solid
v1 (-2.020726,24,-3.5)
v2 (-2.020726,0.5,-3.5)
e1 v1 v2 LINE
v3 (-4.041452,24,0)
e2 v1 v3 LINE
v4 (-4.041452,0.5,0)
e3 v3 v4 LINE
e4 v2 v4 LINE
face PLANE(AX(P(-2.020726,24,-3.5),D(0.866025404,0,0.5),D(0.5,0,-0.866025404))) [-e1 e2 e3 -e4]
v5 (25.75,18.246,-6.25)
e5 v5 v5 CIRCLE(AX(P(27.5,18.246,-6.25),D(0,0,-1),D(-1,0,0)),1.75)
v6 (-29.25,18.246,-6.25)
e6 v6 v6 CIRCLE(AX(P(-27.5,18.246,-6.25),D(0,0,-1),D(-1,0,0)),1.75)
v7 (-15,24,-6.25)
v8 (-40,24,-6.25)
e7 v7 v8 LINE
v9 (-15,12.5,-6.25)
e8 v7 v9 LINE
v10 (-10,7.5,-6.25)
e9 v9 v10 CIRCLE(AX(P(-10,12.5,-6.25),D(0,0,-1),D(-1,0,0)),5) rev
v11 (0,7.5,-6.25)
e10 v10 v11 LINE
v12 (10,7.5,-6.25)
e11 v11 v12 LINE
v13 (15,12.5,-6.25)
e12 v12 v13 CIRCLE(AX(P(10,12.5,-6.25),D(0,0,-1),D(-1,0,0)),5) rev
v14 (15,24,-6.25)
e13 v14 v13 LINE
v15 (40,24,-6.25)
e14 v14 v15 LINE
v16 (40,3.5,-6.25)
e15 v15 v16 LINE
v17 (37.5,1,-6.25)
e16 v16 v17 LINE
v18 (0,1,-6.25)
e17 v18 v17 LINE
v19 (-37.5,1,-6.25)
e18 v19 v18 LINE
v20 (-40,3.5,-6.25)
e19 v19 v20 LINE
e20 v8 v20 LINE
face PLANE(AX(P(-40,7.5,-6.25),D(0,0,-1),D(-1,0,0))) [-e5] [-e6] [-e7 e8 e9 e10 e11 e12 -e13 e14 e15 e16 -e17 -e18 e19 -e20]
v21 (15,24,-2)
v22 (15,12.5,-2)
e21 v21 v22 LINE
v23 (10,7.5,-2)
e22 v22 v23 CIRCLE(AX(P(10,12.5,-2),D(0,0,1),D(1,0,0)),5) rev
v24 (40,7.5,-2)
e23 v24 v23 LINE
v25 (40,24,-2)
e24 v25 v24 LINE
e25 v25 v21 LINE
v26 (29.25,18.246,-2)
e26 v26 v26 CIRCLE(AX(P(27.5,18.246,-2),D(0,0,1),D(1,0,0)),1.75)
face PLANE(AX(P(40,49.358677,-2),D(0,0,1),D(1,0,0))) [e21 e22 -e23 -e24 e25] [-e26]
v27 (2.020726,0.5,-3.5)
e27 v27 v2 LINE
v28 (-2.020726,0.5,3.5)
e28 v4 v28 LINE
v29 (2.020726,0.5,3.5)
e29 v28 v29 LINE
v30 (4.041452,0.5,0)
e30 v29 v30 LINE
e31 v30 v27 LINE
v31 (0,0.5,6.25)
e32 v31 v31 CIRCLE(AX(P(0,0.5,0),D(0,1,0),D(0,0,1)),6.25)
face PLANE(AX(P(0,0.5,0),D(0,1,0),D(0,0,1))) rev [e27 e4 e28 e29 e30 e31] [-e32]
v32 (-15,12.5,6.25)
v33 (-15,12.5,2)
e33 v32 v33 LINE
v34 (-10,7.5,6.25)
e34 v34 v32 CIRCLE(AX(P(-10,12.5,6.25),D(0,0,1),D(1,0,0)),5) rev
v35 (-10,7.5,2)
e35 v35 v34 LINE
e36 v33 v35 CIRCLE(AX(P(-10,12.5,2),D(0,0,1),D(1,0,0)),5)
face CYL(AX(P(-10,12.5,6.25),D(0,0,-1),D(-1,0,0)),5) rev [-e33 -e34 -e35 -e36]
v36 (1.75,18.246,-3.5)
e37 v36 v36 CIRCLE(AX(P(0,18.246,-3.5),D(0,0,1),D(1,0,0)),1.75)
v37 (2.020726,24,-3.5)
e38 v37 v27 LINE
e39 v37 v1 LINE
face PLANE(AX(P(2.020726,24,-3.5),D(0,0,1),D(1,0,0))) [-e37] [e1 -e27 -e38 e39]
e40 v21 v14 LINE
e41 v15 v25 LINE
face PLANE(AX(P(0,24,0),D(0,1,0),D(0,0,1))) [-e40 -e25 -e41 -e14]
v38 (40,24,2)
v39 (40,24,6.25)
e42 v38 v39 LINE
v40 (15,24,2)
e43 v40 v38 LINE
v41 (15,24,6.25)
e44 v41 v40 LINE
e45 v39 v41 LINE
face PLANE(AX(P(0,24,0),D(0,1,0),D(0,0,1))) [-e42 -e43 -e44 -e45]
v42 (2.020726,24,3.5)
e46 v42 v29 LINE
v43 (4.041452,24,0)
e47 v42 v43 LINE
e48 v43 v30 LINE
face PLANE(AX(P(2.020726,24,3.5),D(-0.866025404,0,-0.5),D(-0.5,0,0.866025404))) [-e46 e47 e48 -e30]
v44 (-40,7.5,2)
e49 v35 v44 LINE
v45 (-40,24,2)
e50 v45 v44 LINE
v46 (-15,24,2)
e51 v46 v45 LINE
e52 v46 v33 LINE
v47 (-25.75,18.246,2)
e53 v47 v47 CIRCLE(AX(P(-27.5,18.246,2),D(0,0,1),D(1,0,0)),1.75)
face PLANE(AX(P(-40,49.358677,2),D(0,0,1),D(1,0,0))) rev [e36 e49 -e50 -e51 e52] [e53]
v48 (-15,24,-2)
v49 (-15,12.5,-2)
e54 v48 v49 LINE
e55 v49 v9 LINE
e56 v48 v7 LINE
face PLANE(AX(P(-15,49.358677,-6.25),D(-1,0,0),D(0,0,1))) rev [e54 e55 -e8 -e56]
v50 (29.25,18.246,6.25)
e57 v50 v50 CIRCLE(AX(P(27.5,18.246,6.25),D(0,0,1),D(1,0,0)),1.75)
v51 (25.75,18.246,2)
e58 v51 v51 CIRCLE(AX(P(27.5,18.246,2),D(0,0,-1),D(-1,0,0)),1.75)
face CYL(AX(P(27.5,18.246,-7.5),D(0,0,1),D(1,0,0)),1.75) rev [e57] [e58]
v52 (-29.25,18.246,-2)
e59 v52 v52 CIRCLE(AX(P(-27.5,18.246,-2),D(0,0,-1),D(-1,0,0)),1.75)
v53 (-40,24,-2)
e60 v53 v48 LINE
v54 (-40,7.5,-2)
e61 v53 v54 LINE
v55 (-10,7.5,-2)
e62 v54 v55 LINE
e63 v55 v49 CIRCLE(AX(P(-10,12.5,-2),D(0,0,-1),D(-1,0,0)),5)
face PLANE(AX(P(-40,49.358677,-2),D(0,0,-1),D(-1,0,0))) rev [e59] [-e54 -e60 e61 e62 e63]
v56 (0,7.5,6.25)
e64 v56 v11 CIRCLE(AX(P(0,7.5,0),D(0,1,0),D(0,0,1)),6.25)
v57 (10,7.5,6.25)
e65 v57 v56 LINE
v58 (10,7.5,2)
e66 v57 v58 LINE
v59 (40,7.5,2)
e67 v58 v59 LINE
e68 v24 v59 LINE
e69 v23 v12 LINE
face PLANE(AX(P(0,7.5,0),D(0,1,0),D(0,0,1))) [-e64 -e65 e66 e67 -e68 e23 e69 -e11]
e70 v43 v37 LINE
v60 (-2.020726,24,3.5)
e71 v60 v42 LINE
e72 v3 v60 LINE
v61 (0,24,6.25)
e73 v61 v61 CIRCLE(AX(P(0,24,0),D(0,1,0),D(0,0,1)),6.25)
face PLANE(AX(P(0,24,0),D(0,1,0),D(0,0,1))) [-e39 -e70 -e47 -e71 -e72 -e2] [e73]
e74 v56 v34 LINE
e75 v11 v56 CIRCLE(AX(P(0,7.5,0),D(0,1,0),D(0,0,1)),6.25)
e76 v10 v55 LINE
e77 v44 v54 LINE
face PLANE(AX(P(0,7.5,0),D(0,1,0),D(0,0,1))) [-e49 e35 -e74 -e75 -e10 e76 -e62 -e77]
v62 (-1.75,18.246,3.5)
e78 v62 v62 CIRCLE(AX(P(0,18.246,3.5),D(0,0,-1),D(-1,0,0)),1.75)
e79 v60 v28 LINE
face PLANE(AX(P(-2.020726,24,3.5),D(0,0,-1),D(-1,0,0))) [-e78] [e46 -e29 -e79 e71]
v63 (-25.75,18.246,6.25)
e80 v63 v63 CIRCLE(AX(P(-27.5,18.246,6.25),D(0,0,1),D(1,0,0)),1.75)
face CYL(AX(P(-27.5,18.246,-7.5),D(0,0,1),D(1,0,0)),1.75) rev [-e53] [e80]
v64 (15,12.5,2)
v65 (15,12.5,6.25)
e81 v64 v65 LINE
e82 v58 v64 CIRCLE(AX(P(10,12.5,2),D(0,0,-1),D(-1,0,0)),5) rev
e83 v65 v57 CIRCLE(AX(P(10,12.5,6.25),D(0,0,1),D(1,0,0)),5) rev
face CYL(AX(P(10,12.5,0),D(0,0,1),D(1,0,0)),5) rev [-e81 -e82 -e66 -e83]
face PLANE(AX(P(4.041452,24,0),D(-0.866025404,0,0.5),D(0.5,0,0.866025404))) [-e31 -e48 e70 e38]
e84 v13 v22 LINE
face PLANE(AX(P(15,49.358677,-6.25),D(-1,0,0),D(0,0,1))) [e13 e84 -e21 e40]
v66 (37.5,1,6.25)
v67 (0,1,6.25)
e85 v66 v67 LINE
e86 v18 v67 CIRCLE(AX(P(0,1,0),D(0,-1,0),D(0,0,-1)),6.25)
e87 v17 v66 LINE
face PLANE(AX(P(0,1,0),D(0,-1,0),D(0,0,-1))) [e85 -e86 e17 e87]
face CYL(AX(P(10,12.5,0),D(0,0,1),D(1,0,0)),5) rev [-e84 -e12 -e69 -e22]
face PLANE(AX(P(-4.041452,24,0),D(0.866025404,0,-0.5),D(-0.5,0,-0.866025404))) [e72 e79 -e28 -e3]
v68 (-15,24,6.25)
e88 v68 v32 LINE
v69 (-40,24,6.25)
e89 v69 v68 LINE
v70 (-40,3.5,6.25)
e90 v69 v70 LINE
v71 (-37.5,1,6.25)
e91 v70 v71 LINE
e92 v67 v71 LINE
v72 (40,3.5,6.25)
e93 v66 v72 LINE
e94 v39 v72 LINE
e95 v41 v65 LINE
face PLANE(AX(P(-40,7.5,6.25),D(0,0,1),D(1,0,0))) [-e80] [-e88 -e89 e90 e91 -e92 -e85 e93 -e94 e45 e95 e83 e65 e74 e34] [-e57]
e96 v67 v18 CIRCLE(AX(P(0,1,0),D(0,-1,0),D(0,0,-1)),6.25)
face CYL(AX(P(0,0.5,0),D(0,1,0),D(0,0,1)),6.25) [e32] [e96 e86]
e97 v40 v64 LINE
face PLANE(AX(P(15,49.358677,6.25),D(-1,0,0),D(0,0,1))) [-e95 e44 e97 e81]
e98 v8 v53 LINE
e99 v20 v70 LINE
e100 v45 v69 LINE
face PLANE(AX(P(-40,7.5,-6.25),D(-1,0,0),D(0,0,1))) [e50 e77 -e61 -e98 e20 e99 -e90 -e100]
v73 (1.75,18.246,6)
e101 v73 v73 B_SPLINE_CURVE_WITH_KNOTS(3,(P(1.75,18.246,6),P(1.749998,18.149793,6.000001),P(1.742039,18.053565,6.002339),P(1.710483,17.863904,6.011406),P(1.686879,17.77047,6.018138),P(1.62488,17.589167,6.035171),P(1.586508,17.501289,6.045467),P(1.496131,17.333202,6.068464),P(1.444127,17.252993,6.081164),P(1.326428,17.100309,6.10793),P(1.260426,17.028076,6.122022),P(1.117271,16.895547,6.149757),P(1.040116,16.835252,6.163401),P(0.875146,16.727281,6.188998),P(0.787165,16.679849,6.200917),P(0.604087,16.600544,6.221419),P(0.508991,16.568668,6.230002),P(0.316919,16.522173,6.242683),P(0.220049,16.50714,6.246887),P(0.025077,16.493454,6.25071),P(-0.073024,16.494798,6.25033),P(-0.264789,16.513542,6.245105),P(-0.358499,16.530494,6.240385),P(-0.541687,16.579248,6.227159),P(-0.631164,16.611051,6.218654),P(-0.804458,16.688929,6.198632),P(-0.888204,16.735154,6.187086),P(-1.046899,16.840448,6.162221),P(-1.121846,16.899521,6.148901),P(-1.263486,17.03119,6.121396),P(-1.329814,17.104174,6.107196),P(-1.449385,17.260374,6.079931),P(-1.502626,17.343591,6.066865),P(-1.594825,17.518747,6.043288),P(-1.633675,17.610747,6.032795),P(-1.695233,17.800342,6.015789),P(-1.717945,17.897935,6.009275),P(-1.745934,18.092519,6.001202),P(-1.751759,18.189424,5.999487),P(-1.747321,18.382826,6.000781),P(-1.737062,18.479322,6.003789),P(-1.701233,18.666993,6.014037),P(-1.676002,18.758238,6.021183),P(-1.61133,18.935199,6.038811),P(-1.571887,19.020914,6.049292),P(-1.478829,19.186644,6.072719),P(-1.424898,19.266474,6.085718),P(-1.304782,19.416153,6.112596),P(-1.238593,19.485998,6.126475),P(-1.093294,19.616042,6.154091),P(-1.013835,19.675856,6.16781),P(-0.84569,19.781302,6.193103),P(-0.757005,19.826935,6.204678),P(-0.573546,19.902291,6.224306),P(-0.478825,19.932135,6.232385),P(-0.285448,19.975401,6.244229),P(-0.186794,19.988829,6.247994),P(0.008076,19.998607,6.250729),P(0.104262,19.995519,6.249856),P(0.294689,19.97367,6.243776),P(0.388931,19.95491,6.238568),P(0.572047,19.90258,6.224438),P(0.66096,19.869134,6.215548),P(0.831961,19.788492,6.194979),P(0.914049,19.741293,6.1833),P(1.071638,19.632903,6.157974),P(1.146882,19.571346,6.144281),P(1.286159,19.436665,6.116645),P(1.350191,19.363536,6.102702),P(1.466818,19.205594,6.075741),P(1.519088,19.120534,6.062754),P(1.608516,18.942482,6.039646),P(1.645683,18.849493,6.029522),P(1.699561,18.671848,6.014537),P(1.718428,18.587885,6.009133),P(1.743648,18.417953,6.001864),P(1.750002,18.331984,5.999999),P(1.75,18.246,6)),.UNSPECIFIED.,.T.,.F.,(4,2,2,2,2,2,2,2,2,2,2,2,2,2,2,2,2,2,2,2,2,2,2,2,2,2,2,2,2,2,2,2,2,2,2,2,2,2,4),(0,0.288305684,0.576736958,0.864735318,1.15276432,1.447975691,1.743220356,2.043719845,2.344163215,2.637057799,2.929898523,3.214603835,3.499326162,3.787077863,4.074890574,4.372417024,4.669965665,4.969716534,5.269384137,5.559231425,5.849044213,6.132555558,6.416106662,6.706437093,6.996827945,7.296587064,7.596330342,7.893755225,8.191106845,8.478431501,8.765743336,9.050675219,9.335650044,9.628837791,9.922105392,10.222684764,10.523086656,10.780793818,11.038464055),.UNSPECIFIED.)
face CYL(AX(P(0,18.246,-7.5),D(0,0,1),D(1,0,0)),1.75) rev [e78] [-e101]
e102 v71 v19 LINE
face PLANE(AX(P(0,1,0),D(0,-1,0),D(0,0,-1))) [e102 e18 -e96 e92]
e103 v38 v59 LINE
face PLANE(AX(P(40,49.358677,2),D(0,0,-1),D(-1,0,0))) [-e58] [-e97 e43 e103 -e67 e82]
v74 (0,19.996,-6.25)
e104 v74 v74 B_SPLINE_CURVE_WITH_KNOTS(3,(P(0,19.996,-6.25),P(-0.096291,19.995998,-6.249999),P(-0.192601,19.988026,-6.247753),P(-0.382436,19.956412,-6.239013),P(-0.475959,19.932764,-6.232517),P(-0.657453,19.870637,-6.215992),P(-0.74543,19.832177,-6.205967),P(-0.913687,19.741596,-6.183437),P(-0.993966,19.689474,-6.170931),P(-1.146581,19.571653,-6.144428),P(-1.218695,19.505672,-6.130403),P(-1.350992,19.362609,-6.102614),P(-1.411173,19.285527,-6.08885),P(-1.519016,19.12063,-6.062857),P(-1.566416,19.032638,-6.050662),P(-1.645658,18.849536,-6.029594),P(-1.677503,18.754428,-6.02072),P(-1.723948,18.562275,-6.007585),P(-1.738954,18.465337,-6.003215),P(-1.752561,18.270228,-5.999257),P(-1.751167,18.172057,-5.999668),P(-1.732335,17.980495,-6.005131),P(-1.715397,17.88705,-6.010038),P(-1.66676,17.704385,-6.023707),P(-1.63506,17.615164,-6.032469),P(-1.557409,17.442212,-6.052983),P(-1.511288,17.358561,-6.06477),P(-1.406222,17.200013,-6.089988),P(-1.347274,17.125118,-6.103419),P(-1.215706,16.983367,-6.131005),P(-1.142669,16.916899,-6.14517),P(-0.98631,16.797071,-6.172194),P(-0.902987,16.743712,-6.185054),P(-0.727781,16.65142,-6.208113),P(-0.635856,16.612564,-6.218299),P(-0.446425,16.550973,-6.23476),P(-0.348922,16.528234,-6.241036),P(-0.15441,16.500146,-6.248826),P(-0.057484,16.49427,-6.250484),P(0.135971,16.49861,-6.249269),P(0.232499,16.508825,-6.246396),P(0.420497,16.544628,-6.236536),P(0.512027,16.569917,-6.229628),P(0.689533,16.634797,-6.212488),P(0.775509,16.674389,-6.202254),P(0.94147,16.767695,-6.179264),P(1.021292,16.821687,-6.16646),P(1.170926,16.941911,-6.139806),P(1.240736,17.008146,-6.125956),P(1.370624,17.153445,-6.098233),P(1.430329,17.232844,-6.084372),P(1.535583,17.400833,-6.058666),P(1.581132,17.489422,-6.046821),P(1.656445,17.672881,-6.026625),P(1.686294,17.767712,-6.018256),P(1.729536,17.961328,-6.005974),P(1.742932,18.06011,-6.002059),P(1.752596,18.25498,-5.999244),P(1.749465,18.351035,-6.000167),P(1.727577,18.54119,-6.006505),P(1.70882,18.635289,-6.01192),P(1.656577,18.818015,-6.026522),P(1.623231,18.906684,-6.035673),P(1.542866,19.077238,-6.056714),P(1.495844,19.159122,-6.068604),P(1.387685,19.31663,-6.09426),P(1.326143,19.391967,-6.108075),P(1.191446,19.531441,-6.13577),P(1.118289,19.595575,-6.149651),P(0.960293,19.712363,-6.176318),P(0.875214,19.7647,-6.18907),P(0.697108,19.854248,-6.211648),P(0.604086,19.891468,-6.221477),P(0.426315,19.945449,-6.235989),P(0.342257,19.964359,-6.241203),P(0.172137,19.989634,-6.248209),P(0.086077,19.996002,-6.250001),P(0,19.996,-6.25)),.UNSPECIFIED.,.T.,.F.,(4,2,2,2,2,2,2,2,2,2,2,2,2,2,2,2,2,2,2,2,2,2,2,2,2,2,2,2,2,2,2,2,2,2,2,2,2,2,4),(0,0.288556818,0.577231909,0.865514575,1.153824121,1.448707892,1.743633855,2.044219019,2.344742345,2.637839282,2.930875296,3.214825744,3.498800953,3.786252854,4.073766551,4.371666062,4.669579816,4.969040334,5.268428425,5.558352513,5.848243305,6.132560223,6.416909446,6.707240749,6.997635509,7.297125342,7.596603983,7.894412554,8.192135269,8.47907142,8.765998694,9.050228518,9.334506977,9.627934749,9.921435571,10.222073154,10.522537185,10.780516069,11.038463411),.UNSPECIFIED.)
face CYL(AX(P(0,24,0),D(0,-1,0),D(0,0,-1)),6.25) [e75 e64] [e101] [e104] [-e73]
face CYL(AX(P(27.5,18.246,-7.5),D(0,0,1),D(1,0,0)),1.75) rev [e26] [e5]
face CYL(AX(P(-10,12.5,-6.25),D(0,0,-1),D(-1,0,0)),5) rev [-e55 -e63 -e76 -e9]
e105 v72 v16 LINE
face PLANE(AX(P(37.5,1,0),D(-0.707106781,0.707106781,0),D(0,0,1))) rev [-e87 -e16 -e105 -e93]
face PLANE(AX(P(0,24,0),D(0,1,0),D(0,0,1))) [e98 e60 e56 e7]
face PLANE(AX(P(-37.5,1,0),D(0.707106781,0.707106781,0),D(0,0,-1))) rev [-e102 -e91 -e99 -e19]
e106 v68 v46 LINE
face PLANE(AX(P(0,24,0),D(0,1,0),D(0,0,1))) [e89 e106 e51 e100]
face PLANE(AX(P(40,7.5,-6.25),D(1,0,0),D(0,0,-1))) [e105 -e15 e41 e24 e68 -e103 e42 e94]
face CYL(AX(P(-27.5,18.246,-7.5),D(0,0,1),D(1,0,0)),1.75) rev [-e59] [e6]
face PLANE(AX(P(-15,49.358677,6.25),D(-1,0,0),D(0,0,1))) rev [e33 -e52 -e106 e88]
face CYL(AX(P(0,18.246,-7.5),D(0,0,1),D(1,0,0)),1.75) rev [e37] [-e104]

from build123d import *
from build123d.topology import SkipClean

# Parameters (mm, degrees)
SKETCH1_R           = 6.25
BOSS_EXTRUDE1_DEPTH = 24
SKETCH2_R           = 1.75
CUT_EXTRUDE2_DEPTH  = 7.5
SKETCH3_W           = 80
SKETCH3_H           = 12.5
BOSS_EXTRUDE2_DEPTH = 7.5
CUT_EXTRUDE3_DEPTH  = 44.718560184
SKETCH5_W           = 80
SKETCH5_H           = 12.5
CUT_EXTRUDE4_DEPTH  = 1
BOSS_EXTRUDE3_START = -23.5
SKETCH6_R           = 6.25
BOSS_EXTRUDE3_DEPTH = 23.5
SKETCH7_W           = 25
SKETCH7_H           = 4.25
BOSS_EXTRUDE4_DEPTH = 16.5
FILLET1_R           = 5
SKETCH8_R           = 1.75
CUT_EXTRUDE5_DEPTH  = 7.5
LPATTERN1_COUNT     = 2
LPATTERN1_PITCH     = 27.5
LPATTERN1_COL_COUNT = 2
LPATTERN1_COL_PITCH = 27.5
CHAMFER1_SIZE       = 2.5


with BuildPart() as part:
    # Sketch1 → Boss-Extrude1 (new body)
    with BuildSketch(Plane(origin=(0, 0, 0), x_dir=(1, 0, 0), z_dir=(0, 1, 0))):
        with Locations(Location((0, 0, 0), (0, 0, 270))):
            Circle(SKETCH1_R)
        Polygon((4.041451884, 0), (2.020725942, 3.5), (-2.020725942, 3.5), (-4.041451884, 0), (-2.020725942, -3.5), (2.020725942, -3.5), align=None, mode=Mode.SUBTRACT)
    extrude(amount=BOSS_EXTRUDE1_DEPTH)

    # Sketch2 → Cut-Extrude2 (cut, symmetric)
    with BuildSketch(Plane.XY):
        with Locations((0, 17.746)):
            Circle(SKETCH2_R)
    extrude(amount=CUT_EXTRUDE2_DEPTH, both=True, mode=Mode.SUBTRACT)

    # Sketch3 → Boss-Extrude2 (add)
    with BuildSketch(Plane.XZ):
        Rectangle(SKETCH3_W, SKETCH3_H)
    extrude(amount=-BOSS_EXTRUDE2_DEPTH)

    # Sketch4 → Cut-Extrude3 (cut, through all)
    with BuildSketch(Plane(origin=(0, 7.5, 0), x_dir=(1, 0, 0), z_dir=(0, 1, 0))):
        Polygon((-2.020725942, -3.5), (2.020725942, -3.5), (4.041451884, 0), (2.020725942, 3.5), (-2.020725942, 3.5), (-4.041451884, 0), align=None)
    extrude(amount=-CUT_EXTRUDE3_DEPTH, mode=Mode.SUBTRACT)

    # Sketch5 → Cut-Extrude4 (cut)
    with BuildSketch(Plane.XZ):
        Rectangle(SKETCH5_W, SKETCH5_H)
    extrude(amount=-CUT_EXTRUDE4_DEPTH, mode=Mode.SUBTRACT)

    # Sketch6 → Boss-Extrude3 (add)
    with SkipClean():  # the faces are left unmerged after this step: merging them gives an invalid solid
        with BuildSketch(Plane(origin=(0, 24, 0), x_dir=(1, 0, 0), z_dir=(0, 1, 0)).offset(BOSS_EXTRUDE3_START)):
            with Locations(Location((0, 0, 0), (0, 0, 270))):
                Circle(SKETCH6_R)
            Polygon((-2.020725942, 3.5), (-4.041451884, 0), (-2.020725942, -3.5), (2.020725942, -3.5), (4.041451884, 0), (2.020725942, 3.5), align=None, mode=Mode.SUBTRACT)
        extrude(amount=BOSS_EXTRUDE3_DEPTH)
    add(part.part.scale(1), mode=Mode.REPLACE)  # the faces are merged on a copy

    # Sketch7 → Boss-Extrude4 (add)
    with BuildSketch(Plane(origin=(0, 7.5, 0), x_dir=(1, 0, 0), z_dir=(0, 1, 0))):
        with Locations((-27.5, 4.125)):
            Rectangle(SKETCH7_W, SKETCH7_H)
        with Locations((-27.5, -4.125)):
            Rectangle(SKETCH7_W, SKETCH7_H)
    boss_extrude4 = extrude(amount=BOSS_EXTRUDE4_DEPTH)

    # Mirror1: Boss-Extrude4 across plane
    add(boss_extrude4.mirror(Plane(origin=(0, 0, 0), x_dir=(0, 0, 1), z_dir=(1, 0, 0))))

    # Fillet1
    fillet1_edges = [part.edges().sort_by_distance(p)[0] for p in [
        (-15, 7.5, -4.125),
        (-15, 7.5, 4.125),
        (15, 7.5, -4.125),
        (15, 7.5, 4.125),
    ]]
    fillet(fillet1_edges, radius=FILLET1_R)

    # Sketch8 → Cut-Extrude5 (cut, symmetric)
    with BuildSketch(Plane.XY):
        with Locations((0, 18.246)):
            Circle(SKETCH8_R)
    cut_extrude5 = extrude(amount=CUT_EXTRUDE5_DEPTH, both=True, mode=Mode.SUBTRACT)

    # LPattern1: Cut-Extrude5 ×2
    with Locations(*[(i * LPATTERN1_PITCH, 0, 0) for i in range(1, LPATTERN1_COUNT)]):
        add(cut_extrude5, mode=Mode.SUBTRACT)

    # LPattern1 col: Cut-Extrude5 ×2
    with Locations(*[(-i * LPATTERN1_COL_PITCH, 0, 0) for i in range(1, LPATTERN1_COL_COUNT)]):
        add(cut_extrude5, mode=Mode.SUBTRACT)

    # Chamfer1
    chamfer1_edges = [part.edges().sort_by_distance(p)[0] for p in [
        (40, 1, 0),
        (-40, 1, 0),
    ]]
    chamfer(chamfer1_edges, length=CHAMFER1_SIZE)


solid = part.part
